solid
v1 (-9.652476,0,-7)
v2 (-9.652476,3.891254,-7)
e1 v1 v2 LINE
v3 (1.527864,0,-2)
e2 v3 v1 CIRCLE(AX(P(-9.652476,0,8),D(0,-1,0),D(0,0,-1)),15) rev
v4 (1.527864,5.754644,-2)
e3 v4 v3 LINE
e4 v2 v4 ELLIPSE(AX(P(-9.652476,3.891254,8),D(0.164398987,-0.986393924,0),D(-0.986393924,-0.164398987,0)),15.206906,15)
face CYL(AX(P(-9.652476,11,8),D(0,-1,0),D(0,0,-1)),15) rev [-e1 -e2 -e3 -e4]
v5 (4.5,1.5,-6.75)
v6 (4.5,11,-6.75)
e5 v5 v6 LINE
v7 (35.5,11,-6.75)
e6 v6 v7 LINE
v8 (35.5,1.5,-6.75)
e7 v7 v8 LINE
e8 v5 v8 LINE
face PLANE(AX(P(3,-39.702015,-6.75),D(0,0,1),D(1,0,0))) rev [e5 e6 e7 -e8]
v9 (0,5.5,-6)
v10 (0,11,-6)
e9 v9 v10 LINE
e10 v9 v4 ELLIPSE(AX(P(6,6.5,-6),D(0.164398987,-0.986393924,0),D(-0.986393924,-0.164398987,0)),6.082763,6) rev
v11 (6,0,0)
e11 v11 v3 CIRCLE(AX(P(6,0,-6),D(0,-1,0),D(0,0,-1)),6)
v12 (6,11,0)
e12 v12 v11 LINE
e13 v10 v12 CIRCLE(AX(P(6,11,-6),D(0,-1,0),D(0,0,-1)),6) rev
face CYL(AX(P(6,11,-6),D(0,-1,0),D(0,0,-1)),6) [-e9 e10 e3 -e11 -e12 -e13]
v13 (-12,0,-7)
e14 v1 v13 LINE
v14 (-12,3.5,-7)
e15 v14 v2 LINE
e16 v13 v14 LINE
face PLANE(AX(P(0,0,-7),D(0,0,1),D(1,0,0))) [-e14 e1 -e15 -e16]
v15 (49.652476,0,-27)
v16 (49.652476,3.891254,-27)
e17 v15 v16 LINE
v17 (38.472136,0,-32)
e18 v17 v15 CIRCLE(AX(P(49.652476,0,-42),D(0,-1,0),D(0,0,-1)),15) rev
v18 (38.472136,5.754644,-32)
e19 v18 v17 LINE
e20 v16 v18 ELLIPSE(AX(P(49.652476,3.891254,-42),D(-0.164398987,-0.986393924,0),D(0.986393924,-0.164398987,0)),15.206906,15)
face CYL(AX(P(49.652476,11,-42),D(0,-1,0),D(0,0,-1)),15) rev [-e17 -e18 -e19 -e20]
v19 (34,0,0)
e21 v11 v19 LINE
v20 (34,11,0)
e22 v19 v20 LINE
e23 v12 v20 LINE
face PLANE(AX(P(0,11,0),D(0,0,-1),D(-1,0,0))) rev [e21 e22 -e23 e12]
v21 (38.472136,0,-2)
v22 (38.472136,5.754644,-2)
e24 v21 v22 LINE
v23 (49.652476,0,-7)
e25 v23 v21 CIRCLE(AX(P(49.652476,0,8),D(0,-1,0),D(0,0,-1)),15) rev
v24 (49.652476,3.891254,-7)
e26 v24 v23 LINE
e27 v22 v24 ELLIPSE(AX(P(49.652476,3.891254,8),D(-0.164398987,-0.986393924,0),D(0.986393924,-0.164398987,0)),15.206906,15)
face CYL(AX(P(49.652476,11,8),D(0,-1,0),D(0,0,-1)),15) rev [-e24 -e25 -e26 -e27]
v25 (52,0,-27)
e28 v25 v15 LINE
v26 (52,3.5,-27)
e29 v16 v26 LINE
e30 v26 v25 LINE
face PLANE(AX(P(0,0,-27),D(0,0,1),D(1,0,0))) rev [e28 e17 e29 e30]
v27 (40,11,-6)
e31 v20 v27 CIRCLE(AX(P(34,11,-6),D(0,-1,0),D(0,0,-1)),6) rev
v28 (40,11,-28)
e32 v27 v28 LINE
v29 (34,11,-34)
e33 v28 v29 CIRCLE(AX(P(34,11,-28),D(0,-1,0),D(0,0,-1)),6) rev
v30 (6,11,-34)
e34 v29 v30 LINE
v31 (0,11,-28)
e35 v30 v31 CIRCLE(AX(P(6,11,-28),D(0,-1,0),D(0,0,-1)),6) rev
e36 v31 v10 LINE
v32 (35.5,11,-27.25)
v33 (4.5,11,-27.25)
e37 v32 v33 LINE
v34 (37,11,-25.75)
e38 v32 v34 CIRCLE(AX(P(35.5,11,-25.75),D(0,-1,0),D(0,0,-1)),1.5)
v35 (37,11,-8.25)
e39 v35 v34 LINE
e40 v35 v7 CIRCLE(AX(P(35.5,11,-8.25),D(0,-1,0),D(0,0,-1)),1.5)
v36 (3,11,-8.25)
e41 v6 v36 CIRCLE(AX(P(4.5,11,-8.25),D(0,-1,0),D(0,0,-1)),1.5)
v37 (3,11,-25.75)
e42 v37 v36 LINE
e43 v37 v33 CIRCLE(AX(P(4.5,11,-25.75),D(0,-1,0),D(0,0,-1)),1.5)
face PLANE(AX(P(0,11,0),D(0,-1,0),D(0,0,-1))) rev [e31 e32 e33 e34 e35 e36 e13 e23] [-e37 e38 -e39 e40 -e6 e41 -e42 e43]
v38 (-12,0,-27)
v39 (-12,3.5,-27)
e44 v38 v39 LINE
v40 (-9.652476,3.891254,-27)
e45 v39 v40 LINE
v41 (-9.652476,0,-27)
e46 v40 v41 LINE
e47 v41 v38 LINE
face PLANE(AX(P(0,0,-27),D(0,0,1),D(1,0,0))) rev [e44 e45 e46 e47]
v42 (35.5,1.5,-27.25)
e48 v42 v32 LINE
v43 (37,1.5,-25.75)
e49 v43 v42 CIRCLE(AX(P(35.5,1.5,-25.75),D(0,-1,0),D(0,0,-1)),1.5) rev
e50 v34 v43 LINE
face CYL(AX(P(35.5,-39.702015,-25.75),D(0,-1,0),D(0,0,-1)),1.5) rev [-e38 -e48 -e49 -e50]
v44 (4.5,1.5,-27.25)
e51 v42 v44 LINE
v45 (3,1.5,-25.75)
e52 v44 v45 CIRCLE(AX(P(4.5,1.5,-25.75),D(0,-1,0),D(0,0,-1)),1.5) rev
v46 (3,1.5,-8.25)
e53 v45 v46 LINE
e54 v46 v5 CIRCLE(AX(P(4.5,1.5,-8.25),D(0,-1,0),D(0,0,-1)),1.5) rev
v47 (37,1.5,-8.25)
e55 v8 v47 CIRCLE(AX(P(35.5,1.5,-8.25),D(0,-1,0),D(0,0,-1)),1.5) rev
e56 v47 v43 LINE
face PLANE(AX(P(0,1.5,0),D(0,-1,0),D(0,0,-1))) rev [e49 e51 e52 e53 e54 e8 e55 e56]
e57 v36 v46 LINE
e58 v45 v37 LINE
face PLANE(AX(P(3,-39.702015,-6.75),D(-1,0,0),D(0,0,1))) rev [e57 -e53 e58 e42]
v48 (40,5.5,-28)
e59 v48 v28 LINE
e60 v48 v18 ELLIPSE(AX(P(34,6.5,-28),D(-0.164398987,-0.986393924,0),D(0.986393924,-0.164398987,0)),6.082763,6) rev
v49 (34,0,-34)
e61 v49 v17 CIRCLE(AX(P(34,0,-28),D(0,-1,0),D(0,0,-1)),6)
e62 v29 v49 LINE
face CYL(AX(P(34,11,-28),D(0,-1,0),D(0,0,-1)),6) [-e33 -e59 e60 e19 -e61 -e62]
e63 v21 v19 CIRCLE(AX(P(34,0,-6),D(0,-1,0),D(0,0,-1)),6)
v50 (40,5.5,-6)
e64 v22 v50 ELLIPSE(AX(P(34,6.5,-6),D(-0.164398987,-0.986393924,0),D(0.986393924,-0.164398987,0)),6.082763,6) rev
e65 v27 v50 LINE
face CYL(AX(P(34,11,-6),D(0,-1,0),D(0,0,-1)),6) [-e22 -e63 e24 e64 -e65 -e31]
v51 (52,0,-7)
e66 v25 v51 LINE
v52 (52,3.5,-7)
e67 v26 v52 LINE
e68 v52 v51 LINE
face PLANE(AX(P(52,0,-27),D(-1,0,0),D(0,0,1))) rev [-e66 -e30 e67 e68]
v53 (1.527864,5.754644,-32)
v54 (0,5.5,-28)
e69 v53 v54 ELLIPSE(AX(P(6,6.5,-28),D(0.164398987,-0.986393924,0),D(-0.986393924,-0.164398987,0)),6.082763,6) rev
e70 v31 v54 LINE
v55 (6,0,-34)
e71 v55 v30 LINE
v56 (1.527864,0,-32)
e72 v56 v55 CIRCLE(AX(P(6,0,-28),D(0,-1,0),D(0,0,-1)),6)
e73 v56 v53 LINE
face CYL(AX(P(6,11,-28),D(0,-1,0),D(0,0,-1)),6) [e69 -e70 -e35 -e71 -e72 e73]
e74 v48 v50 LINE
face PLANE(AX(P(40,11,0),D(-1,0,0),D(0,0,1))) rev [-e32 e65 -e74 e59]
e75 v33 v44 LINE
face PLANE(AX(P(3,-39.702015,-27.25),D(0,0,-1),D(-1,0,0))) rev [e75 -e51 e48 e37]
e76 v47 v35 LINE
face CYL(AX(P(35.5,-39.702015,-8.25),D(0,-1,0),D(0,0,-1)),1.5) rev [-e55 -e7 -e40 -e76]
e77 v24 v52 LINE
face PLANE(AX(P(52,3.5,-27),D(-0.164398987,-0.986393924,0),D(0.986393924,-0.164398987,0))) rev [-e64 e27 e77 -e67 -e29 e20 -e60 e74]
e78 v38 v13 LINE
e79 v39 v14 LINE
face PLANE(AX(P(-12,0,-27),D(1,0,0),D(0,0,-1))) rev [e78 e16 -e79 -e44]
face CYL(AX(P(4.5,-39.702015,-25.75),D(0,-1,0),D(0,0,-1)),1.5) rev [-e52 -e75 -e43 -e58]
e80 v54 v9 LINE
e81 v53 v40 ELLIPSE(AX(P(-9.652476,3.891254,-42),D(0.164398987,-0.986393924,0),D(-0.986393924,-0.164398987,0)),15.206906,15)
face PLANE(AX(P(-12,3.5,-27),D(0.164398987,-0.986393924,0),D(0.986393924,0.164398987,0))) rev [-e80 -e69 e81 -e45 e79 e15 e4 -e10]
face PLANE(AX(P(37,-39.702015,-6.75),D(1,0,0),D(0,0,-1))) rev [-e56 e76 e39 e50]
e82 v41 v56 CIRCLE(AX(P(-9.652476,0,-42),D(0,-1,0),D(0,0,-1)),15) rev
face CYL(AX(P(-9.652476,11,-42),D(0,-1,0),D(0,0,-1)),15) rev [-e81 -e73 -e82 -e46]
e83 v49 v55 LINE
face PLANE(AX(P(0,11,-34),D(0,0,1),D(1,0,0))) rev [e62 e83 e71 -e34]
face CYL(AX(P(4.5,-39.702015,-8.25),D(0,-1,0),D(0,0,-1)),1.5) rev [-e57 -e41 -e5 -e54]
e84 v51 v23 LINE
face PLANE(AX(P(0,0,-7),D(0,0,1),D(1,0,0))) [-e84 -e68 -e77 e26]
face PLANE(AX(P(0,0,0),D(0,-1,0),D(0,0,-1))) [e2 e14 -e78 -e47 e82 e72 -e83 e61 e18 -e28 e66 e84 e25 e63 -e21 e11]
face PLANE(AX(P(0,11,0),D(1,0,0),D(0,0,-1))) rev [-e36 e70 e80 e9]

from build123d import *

# Parameters (mm, degrees)
SKETCH1_W           = 40
SKETCH1_H           = 34
BOSS_EXTRUDE1_DEPTH = 11
SKETCH3_W           = 34
SKETCH3_H           = 20.5
CUT_EXTRUDE1_DEPTH  = 9.5
FILLET2_R           = 1.5
BOSS_EXTRUDE3_DEPTH = 10
FILLET3_R           = 6
FILLET4_R           = 15


with BuildPart() as part:
    # Sketch1 → Boss-Extrude1 (new body)
    with BuildSketch(Plane(origin=(0, 0, 0), x_dir=(1, 0, 0), z_dir=(0, 1, 0))):
        with Locations((20, 17)):
            Rectangle(SKETCH1_W, SKETCH1_H)
    extrude(amount=BOSS_EXTRUDE1_DEPTH)

    # Sketch3 → Cut-Extrude1 (cut)
    with BuildSketch(Plane(origin=(0, 11, 0), x_dir=(1, 0, 0), z_dir=(0, 1, 0))):
        with Locations((20, 17)):
            Rectangle(SKETCH3_W, SKETCH3_H)
    extrude(amount=-CUT_EXTRUDE1_DEPTH, mode=Mode.SUBTRACT)

    # Fillet2
    fillet2_edges = [part.edges().sort_by_distance(p)[0] for p in [
        (3, 6.25, -27.25),
        (3, 6.25, -6.75),
        (37, 6.25, -6.75),
        (37, 6.25, -27.25),
    ]]
    fillet(fillet2_edges, radius=FILLET2_R)

    # Sketch5 → Boss-Extrude3 (add, symmetric)
    with BuildSketch(Plane(origin=(0, 0, -17), x_dir=(-1, 0, 0), z_dir=(0, 0, -1))):
        Polygon((-40, 0), (-52, 0), (-52, 3.5), (-40, 5.5), align=None)
        Polygon((12, 3.5), (0, 5.5), (0, 0), (12, 0), align=None)
    extrude(amount=BOSS_EXTRUDE3_DEPTH, both=True)

    # Fillet3
    fillet3_edges = [part.edges().sort_by_distance(p)[0] for p in [
        (0, 5.5, -34),
        (40, 5.5, -34),
        (40, 5.5, 0),
        (0, 5.5, 0),
    ]]
    fillet(fillet3_edges, radius=FILLET3_R)

    # Fillet4
    # the kernel refuses this fillet: 15 mm, written as the material it adds along each edge
    with BuildSketch(Plane(origin=(0, 29.631189606, -27), x_dir=(0.2922336268554167, 0, -0.9563469597039189), z_dir=(0, -1, 0))) as fillet4_piece_1_section:
        with BuildLine():
            CenterArc((11.524426372, -13.614620328), FILLET4_R, 114.818587472, 48.189685104)
            Line((-2.820778024, -9.231115926), (-4.255298463, -8.792765485))
            Line((-4.255298463, -8.792765485), (-1.43452044, 0.43835044))
            Line((-1.43452044, 0.43835044), (0.43835044, 1.43452044))
            ThreePointArc((0.43835044, 1.43452044), (1.3946974, 1.142286813), (4.598608218, 1.361462033))
            Line((4.598608218, 1.361462033), (5.22822805, 0))
        make_face()
    fillet4_piece_1 = extrude(amount=29.631189606, mode=Mode.PRIVATE)
    fillet4_piece_1 = split(fillet4_piece_1, bisect_by=Plane(origin=(-2.592829237, 5.067861794, -27.668863599), z_dir=(0.16439898730535746, -0.9863939238321437, 0)), keep=Keep.TOP, mode=Mode.PRIVATE)
    add(fillet4_piece_1)
    with BuildSketch(Plane(origin=(0, 29.631189606, -7), x_dir=(0.2922336268554167, 0, 0.9563469597039189), z_dir=(0, -1, 0))) as fillet4_piece_2_section:
        with BuildLine():
            CenterArc((11.524426372, 13.614620328), FILLET4_R, 196.991727423, 48.189685104)
            Line((-2.820778024, 9.231115926), (-4.255298463, 8.792765485))
            Line((-4.255298463, 8.792765485), (-1.43452044, -0.43835044))
            Line((-1.43452044, -0.43835044), (0.43835044, -1.43452044))
            ThreePointArc((0.43835044, -1.43452044), (1.3946974, -1.142286813), (4.598608218, -1.361462033))
            Line((4.598608218, -1.361462033), (5.22822805, 0))
        make_face()
    fillet4_piece_2 = extrude(amount=29.631189606, mode=Mode.PRIVATE)
    fillet4_piece_2 = split(fillet4_piece_2, bisect_by=Plane(origin=(-2.592829237, 5.067861794, -6.331136401), z_dir=(0.16439898730535746, -0.9863939238321437, 0)), keep=Keep.TOP, mode=Mode.PRIVATE)
    add(fillet4_piece_2)
    with BuildSketch(Plane(origin=(40, 29.631189606, -7), x_dir=(-0.29223362685541665, 0, 0.9563469597039189), z_dir=(0, -1, 0))) as fillet4_piece_3_section:
        with BuildLine():
            CenterArc((11.524426372, -13.614620328), FILLET4_R, 114.818587472, 48.189685104)
            Line((-2.820778024, -9.231115926), (-4.255298463, -8.792765485))
            Line((-4.255298463, -8.792765485), (-1.43452044, 0.43835044))
            Line((-1.43452044, 0.43835044), (0.43835044, 1.43452044))
            ThreePointArc((0.43835044, 1.43452044), (1.3946974, 1.142286813), (4.598608218, 1.361462033))
            Line((4.598608218, 1.361462033), (5.22822805, 0))
        make_face()
    fillet4_piece_3 = extrude(amount=29.631189606, mode=Mode.PRIVATE)
    fillet4_piece_3 = split(fillet4_piece_3, bisect_by=Plane(origin=(42.592829237, 5.067861794, -6.331136401), z_dir=(-0.16439898730535732, -0.9863939238321437, 0)), keep=Keep.TOP, mode=Mode.PRIVATE)
    add(fillet4_piece_3)
    with BuildSketch(Plane(origin=(40, 29.631189606, -27), x_dir=(-0.2922336268554167, 0, -0.9563469597039189), z_dir=(0, -1, 0))) as fillet4_piece_4_section:
        with BuildLine():
            CenterArc((11.524426372, 13.614620328), FILLET4_R, 196.991727423, 48.189685104)
            Line((-2.820778024, 9.231115926), (-4.255298463, 8.792765485))
            Line((-4.255298463, 8.792765485), (-1.43452044, -0.43835044))
            Line((-1.43452044, -0.43835044), (0.43835044, -1.43452044))
            ThreePointArc((0.43835044, -1.43452044), (1.3946974, -1.142286813), (4.598608218, -1.361462033))
            Line((4.598608218, -1.361462033), (5.22822805, 0))
        make_face()
    fillet4_piece_4 = extrude(amount=29.631189606, mode=Mode.PRIVATE)
    fillet4_piece_4 = split(fillet4_piece_4, bisect_by=Plane(origin=(42.592829237, 5.067861794, -27.668863599), z_dir=(-0.16439898730535732, -0.9863939238321437, 0)), keep=Keep.TOP, mode=Mode.PRIVATE)
    add(fillet4_piece_4)


solid = part.part
